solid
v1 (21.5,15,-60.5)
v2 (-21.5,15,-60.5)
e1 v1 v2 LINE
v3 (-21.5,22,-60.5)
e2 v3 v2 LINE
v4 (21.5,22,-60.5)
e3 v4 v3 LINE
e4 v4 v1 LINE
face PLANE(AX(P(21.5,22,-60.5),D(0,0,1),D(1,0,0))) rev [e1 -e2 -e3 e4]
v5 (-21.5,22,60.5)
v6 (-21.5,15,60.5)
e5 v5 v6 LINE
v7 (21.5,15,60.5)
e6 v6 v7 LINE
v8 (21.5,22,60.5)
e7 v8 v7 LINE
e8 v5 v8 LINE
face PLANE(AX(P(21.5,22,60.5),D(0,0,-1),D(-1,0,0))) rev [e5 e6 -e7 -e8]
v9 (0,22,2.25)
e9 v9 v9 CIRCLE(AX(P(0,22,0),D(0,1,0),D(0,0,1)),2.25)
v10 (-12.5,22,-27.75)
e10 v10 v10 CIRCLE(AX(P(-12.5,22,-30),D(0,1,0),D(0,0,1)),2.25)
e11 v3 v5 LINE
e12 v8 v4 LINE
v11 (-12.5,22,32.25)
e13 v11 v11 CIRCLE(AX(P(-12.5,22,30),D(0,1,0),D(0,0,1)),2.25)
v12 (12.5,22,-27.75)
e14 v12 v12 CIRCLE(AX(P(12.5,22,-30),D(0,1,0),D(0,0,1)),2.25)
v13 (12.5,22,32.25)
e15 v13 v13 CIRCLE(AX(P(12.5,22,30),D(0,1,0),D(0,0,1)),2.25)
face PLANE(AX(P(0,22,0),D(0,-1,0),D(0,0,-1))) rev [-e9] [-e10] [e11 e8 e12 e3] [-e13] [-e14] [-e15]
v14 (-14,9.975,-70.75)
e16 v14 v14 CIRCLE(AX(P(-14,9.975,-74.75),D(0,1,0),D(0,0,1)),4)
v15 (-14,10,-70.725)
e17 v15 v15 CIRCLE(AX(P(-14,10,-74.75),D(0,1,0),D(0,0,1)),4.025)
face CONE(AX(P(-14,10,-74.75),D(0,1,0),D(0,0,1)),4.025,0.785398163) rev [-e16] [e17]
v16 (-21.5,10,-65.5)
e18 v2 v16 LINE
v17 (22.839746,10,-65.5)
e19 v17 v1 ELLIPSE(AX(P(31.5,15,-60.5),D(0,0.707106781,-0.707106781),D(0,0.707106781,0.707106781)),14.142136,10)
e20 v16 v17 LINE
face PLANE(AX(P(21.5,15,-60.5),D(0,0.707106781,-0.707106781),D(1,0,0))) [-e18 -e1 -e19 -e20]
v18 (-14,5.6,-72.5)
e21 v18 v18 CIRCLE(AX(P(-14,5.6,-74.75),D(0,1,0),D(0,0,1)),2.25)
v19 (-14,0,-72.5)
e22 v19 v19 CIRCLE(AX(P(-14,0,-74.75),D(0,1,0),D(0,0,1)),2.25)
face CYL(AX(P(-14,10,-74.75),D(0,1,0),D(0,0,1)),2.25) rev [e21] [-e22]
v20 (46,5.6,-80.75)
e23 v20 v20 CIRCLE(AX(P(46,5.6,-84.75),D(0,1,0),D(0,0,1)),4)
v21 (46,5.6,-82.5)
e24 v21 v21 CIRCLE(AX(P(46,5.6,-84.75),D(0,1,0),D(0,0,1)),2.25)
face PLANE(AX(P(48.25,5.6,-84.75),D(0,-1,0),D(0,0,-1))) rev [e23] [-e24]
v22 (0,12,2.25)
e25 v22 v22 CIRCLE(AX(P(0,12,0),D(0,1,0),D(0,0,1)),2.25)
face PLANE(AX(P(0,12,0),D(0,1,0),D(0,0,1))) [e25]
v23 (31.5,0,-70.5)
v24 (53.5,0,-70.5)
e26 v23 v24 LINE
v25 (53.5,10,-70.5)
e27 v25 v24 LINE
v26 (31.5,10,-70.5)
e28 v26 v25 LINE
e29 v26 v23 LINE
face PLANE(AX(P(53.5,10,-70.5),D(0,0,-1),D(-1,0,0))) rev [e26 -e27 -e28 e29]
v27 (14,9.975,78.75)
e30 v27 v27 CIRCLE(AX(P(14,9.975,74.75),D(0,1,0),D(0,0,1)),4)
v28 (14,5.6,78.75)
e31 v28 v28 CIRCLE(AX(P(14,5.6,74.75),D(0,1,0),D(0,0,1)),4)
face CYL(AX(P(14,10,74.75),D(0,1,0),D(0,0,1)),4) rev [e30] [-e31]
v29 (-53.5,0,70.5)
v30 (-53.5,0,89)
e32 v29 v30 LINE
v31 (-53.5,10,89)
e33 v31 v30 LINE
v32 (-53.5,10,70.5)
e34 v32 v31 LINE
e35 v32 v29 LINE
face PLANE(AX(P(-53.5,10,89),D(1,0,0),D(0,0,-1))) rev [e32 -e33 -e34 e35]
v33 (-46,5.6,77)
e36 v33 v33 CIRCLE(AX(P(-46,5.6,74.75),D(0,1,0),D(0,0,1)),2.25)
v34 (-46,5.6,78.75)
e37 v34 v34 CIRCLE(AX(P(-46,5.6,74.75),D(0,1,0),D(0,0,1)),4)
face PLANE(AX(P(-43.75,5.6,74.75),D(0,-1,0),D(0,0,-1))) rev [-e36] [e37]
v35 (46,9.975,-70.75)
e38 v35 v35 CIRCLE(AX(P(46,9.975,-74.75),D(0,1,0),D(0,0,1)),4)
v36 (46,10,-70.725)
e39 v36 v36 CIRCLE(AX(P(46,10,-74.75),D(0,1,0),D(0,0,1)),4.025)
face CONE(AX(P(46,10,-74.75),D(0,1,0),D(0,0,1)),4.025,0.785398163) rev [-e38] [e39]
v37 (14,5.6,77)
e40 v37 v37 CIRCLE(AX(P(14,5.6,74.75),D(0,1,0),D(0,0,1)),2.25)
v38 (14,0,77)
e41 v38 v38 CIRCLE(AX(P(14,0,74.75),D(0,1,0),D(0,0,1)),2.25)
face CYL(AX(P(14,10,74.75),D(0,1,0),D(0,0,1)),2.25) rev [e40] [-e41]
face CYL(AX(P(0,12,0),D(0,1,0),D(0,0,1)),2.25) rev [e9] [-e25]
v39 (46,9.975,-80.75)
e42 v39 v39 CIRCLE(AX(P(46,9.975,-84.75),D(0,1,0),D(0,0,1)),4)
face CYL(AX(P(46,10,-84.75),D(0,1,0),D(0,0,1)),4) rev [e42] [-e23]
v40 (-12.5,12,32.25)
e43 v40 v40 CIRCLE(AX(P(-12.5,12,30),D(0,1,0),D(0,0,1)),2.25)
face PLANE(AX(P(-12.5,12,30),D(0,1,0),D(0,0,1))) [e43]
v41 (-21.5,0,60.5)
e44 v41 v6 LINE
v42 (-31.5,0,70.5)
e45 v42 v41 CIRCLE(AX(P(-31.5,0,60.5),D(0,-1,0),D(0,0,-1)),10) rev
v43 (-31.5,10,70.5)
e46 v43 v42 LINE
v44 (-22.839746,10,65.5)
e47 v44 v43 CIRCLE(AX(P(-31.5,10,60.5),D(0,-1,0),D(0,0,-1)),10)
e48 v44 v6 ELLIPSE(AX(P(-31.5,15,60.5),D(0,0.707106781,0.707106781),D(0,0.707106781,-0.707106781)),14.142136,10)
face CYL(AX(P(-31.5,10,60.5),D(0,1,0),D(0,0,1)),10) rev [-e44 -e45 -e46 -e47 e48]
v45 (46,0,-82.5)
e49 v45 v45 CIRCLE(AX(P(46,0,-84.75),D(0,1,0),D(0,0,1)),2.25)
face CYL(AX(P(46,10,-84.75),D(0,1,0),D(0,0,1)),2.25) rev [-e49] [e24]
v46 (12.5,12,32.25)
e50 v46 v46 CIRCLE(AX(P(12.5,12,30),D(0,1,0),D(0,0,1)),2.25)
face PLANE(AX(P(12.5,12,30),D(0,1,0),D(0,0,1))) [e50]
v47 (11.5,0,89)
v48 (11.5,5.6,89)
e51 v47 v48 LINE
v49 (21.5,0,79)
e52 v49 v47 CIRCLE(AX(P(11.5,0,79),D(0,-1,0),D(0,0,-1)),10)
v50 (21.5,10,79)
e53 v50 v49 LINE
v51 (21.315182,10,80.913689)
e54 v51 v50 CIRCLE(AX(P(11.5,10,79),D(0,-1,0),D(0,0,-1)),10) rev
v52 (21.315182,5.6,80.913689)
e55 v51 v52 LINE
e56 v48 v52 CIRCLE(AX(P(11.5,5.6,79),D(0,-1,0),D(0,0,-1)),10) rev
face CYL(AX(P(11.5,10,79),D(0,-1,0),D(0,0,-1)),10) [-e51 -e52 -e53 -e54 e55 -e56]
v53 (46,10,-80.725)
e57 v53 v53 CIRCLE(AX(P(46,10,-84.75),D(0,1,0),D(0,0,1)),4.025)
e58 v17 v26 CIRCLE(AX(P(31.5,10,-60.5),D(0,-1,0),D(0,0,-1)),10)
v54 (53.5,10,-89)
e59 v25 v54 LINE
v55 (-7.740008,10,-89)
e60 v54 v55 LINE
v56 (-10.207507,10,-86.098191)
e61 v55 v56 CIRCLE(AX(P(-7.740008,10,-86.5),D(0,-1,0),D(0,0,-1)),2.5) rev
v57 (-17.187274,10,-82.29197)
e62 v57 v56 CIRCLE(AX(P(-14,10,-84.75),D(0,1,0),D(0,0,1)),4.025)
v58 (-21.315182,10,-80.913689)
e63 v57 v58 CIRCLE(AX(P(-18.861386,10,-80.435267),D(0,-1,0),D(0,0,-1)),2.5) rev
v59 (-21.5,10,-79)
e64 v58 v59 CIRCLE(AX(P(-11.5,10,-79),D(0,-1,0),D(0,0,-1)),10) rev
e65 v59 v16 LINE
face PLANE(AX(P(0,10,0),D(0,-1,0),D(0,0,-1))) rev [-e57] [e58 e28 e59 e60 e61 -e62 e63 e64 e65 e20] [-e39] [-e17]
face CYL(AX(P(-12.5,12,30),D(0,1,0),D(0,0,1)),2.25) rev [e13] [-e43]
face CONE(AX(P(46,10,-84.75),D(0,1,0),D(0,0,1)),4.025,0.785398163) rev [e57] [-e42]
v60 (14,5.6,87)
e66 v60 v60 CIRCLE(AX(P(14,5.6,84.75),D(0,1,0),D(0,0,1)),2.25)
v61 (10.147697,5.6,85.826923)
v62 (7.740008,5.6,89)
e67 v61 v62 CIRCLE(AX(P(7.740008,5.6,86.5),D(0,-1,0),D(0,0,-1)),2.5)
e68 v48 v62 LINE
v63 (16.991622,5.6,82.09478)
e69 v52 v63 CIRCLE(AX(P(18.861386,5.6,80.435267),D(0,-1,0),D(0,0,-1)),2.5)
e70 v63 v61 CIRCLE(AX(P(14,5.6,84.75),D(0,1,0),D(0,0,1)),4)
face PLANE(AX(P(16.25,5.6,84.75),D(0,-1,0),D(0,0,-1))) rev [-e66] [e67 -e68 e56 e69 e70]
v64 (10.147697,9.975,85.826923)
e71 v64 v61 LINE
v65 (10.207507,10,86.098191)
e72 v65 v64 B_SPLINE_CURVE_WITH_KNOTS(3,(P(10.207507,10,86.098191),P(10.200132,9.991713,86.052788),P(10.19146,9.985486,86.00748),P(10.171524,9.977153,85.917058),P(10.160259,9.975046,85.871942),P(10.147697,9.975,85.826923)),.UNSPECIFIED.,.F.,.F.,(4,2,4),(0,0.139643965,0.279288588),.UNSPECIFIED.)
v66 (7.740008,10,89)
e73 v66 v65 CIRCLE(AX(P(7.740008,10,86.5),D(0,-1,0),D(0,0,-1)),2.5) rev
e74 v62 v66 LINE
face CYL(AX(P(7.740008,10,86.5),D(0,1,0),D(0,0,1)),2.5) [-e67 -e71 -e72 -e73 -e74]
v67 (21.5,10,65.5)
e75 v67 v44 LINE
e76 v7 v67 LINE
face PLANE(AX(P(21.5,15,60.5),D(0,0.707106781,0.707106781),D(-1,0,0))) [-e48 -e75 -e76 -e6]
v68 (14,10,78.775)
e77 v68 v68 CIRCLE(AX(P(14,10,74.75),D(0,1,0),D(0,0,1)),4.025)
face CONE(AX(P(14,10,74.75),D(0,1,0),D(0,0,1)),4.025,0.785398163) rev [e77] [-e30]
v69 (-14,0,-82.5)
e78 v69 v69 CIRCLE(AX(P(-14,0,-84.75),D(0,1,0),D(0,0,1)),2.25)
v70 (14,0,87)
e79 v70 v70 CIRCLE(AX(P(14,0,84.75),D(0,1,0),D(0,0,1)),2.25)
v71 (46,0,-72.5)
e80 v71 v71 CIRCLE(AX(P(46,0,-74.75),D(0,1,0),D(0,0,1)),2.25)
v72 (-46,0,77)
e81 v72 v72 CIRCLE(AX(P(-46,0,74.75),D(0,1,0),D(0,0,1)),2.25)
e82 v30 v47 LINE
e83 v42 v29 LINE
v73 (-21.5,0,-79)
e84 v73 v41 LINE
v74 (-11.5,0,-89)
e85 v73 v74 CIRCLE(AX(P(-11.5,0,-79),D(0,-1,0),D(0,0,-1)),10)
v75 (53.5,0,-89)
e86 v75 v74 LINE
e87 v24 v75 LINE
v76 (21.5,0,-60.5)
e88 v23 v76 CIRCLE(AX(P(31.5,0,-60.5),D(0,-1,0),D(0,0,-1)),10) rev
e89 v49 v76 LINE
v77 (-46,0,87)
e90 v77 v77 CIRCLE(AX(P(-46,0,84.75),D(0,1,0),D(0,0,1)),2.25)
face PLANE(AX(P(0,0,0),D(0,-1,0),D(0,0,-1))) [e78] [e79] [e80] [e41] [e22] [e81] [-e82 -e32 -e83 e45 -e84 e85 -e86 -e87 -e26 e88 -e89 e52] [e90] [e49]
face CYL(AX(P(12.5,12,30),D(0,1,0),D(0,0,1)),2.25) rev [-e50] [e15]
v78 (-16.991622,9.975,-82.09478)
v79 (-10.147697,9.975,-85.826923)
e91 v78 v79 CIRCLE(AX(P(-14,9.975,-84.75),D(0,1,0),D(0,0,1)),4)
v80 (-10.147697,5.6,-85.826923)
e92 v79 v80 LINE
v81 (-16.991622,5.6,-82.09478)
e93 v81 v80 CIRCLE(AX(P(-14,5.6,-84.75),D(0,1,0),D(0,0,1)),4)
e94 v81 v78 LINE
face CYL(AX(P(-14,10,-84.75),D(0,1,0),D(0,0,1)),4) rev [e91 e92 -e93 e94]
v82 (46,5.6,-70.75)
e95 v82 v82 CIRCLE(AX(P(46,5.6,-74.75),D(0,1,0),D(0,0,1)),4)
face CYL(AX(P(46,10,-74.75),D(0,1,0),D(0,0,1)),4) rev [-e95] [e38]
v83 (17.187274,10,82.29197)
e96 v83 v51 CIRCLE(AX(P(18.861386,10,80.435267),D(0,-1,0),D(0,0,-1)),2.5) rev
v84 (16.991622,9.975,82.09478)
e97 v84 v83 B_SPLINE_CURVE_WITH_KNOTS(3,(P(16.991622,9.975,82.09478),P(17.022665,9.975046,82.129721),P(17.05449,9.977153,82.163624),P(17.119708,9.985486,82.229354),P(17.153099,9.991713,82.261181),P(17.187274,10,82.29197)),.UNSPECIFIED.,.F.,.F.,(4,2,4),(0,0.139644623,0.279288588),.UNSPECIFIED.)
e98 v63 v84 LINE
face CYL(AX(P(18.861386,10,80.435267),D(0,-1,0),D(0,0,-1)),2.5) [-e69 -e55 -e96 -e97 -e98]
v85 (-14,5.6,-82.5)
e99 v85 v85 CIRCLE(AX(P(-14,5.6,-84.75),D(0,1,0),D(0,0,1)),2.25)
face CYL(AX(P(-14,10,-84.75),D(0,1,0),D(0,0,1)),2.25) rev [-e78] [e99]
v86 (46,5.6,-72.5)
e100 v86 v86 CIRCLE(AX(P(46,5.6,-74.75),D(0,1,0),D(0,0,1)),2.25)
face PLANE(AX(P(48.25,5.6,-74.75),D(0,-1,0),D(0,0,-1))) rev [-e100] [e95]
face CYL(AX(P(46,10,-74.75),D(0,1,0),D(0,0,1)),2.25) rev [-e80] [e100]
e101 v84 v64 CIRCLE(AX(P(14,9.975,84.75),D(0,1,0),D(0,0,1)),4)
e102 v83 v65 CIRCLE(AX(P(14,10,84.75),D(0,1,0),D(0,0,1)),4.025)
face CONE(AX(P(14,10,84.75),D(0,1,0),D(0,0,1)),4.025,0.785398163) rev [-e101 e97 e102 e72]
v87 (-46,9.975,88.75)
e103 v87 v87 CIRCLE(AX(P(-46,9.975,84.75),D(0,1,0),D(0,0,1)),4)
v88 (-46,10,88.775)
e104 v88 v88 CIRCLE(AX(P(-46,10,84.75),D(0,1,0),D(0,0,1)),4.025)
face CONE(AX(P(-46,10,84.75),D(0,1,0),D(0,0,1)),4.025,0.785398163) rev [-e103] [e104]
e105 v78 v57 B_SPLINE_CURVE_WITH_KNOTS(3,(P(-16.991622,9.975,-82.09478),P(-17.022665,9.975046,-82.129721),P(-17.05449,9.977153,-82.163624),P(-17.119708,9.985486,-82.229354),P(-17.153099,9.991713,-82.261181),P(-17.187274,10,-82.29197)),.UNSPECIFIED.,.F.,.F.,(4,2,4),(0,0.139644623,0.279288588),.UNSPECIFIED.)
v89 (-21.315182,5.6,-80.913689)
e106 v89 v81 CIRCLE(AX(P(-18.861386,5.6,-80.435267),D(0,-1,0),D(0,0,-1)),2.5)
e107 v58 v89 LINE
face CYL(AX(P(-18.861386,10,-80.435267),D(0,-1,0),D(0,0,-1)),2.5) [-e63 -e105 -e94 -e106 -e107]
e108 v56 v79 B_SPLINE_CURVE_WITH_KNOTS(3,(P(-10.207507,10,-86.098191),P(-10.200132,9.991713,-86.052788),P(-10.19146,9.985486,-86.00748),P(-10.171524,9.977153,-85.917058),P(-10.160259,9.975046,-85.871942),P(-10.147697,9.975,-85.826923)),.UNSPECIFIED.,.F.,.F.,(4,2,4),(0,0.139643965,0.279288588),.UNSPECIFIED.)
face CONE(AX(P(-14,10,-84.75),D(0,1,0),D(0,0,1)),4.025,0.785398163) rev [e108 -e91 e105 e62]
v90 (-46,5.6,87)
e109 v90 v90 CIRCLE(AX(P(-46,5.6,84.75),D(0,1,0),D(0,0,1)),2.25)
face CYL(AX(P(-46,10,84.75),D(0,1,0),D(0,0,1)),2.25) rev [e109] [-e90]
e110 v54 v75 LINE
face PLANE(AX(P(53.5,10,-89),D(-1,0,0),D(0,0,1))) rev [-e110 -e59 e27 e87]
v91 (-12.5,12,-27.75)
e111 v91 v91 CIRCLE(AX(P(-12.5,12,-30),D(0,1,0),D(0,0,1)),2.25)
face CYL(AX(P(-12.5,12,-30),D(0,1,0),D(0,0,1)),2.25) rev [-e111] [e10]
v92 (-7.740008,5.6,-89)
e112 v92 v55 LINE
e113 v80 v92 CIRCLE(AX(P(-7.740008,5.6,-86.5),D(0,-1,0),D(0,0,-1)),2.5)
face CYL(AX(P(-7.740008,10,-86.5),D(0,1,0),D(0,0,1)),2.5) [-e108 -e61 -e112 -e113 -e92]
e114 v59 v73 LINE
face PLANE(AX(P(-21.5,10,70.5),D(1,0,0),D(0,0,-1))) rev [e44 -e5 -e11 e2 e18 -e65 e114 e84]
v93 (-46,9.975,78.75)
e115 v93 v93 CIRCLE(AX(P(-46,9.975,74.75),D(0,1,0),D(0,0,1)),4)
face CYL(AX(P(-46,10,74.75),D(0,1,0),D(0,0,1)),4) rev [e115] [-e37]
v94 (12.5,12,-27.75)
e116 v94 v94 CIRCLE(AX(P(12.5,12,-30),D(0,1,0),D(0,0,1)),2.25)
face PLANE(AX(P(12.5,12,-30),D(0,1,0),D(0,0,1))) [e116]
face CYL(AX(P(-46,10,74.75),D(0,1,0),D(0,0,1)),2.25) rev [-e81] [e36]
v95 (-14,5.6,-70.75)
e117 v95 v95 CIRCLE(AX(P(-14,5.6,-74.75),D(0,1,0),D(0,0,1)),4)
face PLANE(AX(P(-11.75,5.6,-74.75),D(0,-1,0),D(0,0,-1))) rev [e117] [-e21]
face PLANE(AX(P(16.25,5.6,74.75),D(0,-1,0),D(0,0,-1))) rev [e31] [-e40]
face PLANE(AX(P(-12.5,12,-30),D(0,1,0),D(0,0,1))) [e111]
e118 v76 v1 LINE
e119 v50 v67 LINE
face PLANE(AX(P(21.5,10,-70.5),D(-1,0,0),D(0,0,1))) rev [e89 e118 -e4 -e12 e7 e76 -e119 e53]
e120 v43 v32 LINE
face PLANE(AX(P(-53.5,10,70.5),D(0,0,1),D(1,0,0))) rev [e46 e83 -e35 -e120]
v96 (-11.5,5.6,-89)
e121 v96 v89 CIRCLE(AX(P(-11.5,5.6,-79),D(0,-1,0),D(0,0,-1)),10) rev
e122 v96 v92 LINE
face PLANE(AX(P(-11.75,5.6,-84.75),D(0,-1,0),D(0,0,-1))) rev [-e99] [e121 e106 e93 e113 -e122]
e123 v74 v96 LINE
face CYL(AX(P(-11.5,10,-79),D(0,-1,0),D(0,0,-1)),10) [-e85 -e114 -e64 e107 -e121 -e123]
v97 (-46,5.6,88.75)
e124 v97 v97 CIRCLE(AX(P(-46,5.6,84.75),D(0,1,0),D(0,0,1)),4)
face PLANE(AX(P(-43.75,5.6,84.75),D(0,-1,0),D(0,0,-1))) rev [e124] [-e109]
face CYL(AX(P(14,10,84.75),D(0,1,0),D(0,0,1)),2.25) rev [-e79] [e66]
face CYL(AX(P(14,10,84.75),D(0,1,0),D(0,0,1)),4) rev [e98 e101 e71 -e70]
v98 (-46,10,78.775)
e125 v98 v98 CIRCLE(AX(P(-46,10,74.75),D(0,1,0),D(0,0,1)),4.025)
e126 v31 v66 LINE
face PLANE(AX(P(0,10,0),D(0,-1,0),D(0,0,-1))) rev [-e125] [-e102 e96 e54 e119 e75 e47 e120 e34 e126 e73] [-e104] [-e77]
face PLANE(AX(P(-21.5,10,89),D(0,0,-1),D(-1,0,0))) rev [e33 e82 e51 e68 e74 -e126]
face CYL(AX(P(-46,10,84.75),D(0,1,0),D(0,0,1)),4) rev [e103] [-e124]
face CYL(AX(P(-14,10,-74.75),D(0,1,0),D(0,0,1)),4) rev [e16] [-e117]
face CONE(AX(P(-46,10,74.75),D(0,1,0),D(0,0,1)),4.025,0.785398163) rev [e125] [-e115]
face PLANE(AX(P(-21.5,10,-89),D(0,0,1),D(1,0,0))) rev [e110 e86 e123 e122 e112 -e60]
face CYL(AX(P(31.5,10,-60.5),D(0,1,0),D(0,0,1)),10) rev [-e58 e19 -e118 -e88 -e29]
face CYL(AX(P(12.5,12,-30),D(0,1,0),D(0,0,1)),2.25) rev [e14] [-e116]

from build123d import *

# Parameters (mm, degrees)
BOSS_EXTRUDE1_DEPTH                          = 10
FILLET1_R                                    = 10
SKETCH2_R                                    = 1.75
CUT_EXTRUDE1_DEPTH                           = 10
CBORE_FOR_M4_HEX_SOCKET_HEAD_CAP_SCR_2_COUNT = 2
CBORE_FOR_M4_HEX_SOCKET_HEAD_CAP_SCR_2_PITCH = 10
CBORE_FOR_M4_HEX_SOCKET_HEAD_CAP_SCR_3_COUNT = 2
CBORE_FOR_M4_HEX_SOCKET_HEAD_CAP_SCR_3_PITCH = 60
CBORE_FOR_M4_HEX_SOCKET_HEAD_CAP_SCR_4_COUNT = 2
CBORE_FOR_M4_HEX_SOCKET_HEAD_CAP_SCR_4_PITCH = 152.099474029
CBORE_FOR_M4_HEX_SOCKET_HEAD_CAP_SCR_5_COUNT = 2
CBORE_FOR_M4_HEX_SOCKET_HEAD_CAP_SCR_5_PITCH = 161.939031737
CBORE_FOR_M4_HEX_SOCKET_HEAD_CAP_SCR_6_COUNT = 2
CBORE_FOR_M4_HEX_SOCKET_HEAD_CAP_SCR_6_PITCH = 162.67836365
CBORE_FOR_M4_HEX_SOCKET_HEAD_CAP_SCR_7_COUNT = 2
CBORE_FOR_M4_HEX_SOCKET_HEAD_CAP_SCR_7_PITCH = 152.886395732
CBORE_FOR_M4_HEX_SOCKET_HEAD_CAP_SCR_8_COUNT = 2
CBORE_FOR_M4_HEX_SOCKET_HEAD_CAP_SCR_8_PITCH = 60.827625303
FILLET2_R                                    = 2.5
FILLET3_R                                    = 2.5
SKETCH5_W                                    = 43
SKETCH5_H                                    = 121
BOSS_EXTRUDE2_DEPTH                          = 12
CHAMFER1_SIZE                                = 5
SKETCH7_R                                    = 2.25
CUT_EXTRUDE2_DEPTH                           = 10
SKETCH8_R                                    = 2.25
CUT_EXTRUDE3_DEPTH                           = 10


with BuildPart() as part:
    # Sketch1 → Boss-Extrude1 (new body)
    with BuildSketch(Plane(origin=(0, 0, 0), x_dir=(1, 0, 0), z_dir=(0, 1, 0))):
        Polygon((-21.5, -89), (21.5, -89), (21.5, 70.5), (53.5, 70.5), (53.5, 89), (-21.5, 89), (-21.5, -70.5), (-53.5, -70.5), (-53.5, -89), align=None)
    extrude(amount=BOSS_EXTRUDE1_DEPTH)

    # Fillet1
    fillet1_edges = [part.edges().sort_by_distance(p)[0] for p in [
        (-21.5, 5, 70.5),
        (-21.5, 5, -89),
        (21.5, 5, -70.5),
        (21.5, 5, 89),
    ]]
    fillet(fillet1_edges, radius=FILLET1_R)

    # Sketch2 → Cut-Extrude1 (cut)
    with BuildSketch(Plane(origin=(0, 10, 0), x_dir=(1, 0, 0), z_dir=(0, 1, 0))):
        with Locations(Location((-14, 74.75, 0), (0, 0, 270))):
            Circle(SKETCH2_R)
        with Locations(Location((-14, 84.75, 0), (0, 0, 270))):
            Circle(SKETCH2_R)
        with Locations(Location((46, 74.75, 0), (0, 0, 270))):
            Circle(SKETCH2_R)
        with Locations(Location((46, 84.75, 0), (0, 0, 270))):
            Circle(SKETCH2_R)
        with Locations(Location((-46, -74.75, 0), (0, 0, 270))):
            Circle(SKETCH2_R)
        with Locations(Location((-46, -84.75, 0), (0, 0, 270))):
            Circle(SKETCH2_R)
        with Locations(Location((14, -74.75, 0), (0, 0, 270))):
            Circle(SKETCH2_R)
        with Locations(Location((14, -84.75, 0), (0, 0, 270))):
            Circle(SKETCH2_R)
    extrude(amount=-CUT_EXTRUDE1_DEPTH, mode=Mode.SUBTRACT)

    # Sketch4 → CBORE for M4 Hex Socket Head Cap Screw1 (revolve, cut)
    with BuildSketch(Plane(origin=(-14, 10, -74.75), x_dir=(0, 0, 1), z_dir=(1, 0, 0))):
        Polygon((0, 0), (0, 11.351936393), (2.25, 10), (2.25, 4.4), (4, 4.4), (4, 0.025), (4.025, 0), align=None)
    cbore_for_m4_hex_socket_head_cap_screw1 = revolve(axis=Axis((-14, 16.35, -74.75), (0, -1, 0)), mode=Mode.SUBTRACT)

    # CBORE for M4 Hex Socket Head Cap Scr 2: CBORE for M4 Hex Socket Head Cap Screw1 ×2
    with Locations(*[(0, 0, -i * CBORE_FOR_M4_HEX_SOCKET_HEAD_CAP_SCR_2_PITCH) for i in range(1, CBORE_FOR_M4_HEX_SOCKET_HEAD_CAP_SCR_2_COUNT)]):
        add(cbore_for_m4_hex_socket_head_cap_screw1, mode=Mode.SUBTRACT)

    # CBORE for M4 Hex Socket Head Cap Scr 3: CBORE for M4 Hex Socket Head Cap Screw1 ×2
    with Locations(*[(i * CBORE_FOR_M4_HEX_SOCKET_HEAD_CAP_SCR_3_PITCH, 0, 0) for i in range(1, CBORE_FOR_M4_HEX_SOCKET_HEAD_CAP_SCR_3_COUNT)]):
        add(cbore_for_m4_hex_socket_head_cap_screw1, mode=Mode.SUBTRACT)

    # CBORE for M4 Hex Socket Head Cap Scr 4: CBORE for M4 Hex Socket Head Cap Screw1 ×2
    with Locations(*[Vector(0.1840900514527529, 0, 0.9829093818639248) * (i * CBORE_FOR_M4_HEX_SOCKET_HEAD_CAP_SCR_4_PITCH) for i in range(1, CBORE_FOR_M4_HEX_SOCKET_HEAD_CAP_SCR_4_COUNT)]):
        add(cbore_for_m4_hex_socket_head_cap_screw1, mode=Mode.SUBTRACT)

    # CBORE for M4 Hex Socket Head Cap Scr 5: CBORE for M4 Hex Socket Head Cap Screw1 ×2
    with Locations(*[Vector(0.1729045783441913, 0, 0.9849385802107751) * (i * CBORE_FOR_M4_HEX_SOCKET_HEAD_CAP_SCR_5_PITCH) for i in range(1, CBORE_FOR_M4_HEX_SOCKET_HEAD_CAP_SCR_5_COUNT)]):
        add(cbore_for_m4_hex_socket_head_cap_screw1, mode=Mode.SUBTRACT)

    # CBORE for M4 Hex Socket Head Cap Scr 6: CBORE for M4 Hex Socket Head Cap Screw1 ×2
    with Locations(*[Vector(-0.19670716671795496, 0, 0.9804622841097942) * (i * CBORE_FOR_M4_HEX_SOCKET_HEAD_CAP_SCR_6_PITCH) for i in range(1, CBORE_FOR_M4_HEX_SOCKET_HEAD_CAP_SCR_6_COUNT)]):
        add(cbore_for_m4_hex_socket_head_cap_screw1, mode=Mode.SUBTRACT)

    # CBORE for M4 Hex Socket Head Cap Scr 7: CBORE for M4 Hex Socket Head Cap Screw1 ×2
    with Locations(*[Vector(-0.20930573872668637, 0, 0.9778502481137263) * (i * CBORE_FOR_M4_HEX_SOCKET_HEAD_CAP_SCR_7_PITCH) for i in range(1, CBORE_FOR_M4_HEX_SOCKET_HEAD_CAP_SCR_7_COUNT)]):
        add(cbore_for_m4_hex_socket_head_cap_screw1, mode=Mode.SUBTRACT)

    # CBORE for M4 Hex Socket Head Cap Scr 8: CBORE for M4 Hex Socket Head Cap Screw1 ×2
    with Locations(*[Vector(0.9863939238321426, 0, -0.1643989873053641) * (i * CBORE_FOR_M4_HEX_SOCKET_HEAD_CAP_SCR_8_PITCH) for i in range(1, CBORE_FOR_M4_HEX_SOCKET_HEAD_CAP_SCR_8_COUNT)]):
        add(cbore_for_m4_hex_socket_head_cap_screw1, mode=Mode.SUBTRACT)

    # Fillet2
    # the kernel refuses this fillet: 2.5 mm, written as the material it takes off along each edge
    with BuildSketch(Plane(origin=(-13.754801439, 5.6, -88.742477635), x_dir=(0.9990847033117879, 0, -0.042775642699985884), z_dir=(0, 1, 0))) as fillet2_piece_1:
        with BuildLine():
            CenterArc((5.91336471, -2.497711758), FILLET2_R, 87.548388178, 105.618498276)
            Line((3.479087926, -3.067182162), (3.235660248, -3.124129202))
            ThreePointArc((3.235660248, -3.124129202), (2.064143441, -1.165399671), (-0.025984683, -0.248645925))
            Line((-0.025984683, -0.248645925), (-0.045899922, 0.245750274))
            ThreePointArc((-0.045899922, 0.245750274), (2.274447223, 0.410607251), (6.030997727, 0.249771176))
            Line((6.030997727, 0.249771176), (6.020303816, 0))
        make_face()
    extrude(amount=19.425759541, mode=Mode.SUBTRACT)
    with BuildSketch(Plane(origin=(-17.087010961, 5.6, -87.293690886), x_dir=(-0.5524220177087732, 0, 0.8335645831911094), z_dir=(0, 1, 0))) as fillet2_piece_2:
        with BuildLine():
            CenterArc((6.697143458, 2.309687979), FILLET2_R, 165.124054411, 127.376595494)
            ThreePointArc((4.280933593, 2.951505625), (2.685480046, 0.685252699), (0, 0))
            ThreePointArc((0, 0), (3.826939119, -0.761248083), (7.653878238, 0))
        make_face()
    extrude(amount=23.509695594, mode=Mode.SUBTRACT)

    # Fillet3
    # the kernel refuses this fillet: 2.5 mm, written as the material it takes off along each edge
    with BuildSketch(Plane(origin=(13.75480144, 5.6, 88.742477635), x_dir=(-0.7777172566996915, 0, -0.6286142446934416), z_dir=(0, 1, 0))) as fillet3_piece_1:
        with BuildLine():
            CenterArc((6.087462048, 2.036971289), FILLET3_R, 128.947957862, 105.618498276)
            Line((4.515926436, 3.98126443), (4.358772875, 4.175693744))
            ThreePointArc((4.358772875, 4.175693744), (1.434562202, 1.812109205), (-0.196946455, 0.153987317))
            Line((-0.196946455, 0.153987317), (0.144939573, -0.203697129))
            ThreePointArc((0.144939573, -0.203697129), (2.319033161, 0.490845938), (4.49312675, -0.203697129))
            Line((4.49312675, -0.203697129), (4.638066322, 0))
        make_face()
    extrude(amount=19.425759541, mode=Mode.SUBTRACT)
    with BuildSketch(Plane(origin=(17.087010961, 5.6, 87.293690886), x_dir=(-0.018344711955799436, 0, -0.9998317216128216), z_dir=(0, 1, 0))) as fillet3_piece_2:
        with BuildLine():
            CenterArc((6.824719559, -1.89989263), FILLET3_R, 130.539588182, 127.376595494)
            ThreePointArc((6.30136363, -4.344498645), (2.718581752, -2.798977477), (0, 0))
            ThreePointArc((0, 0), (2.599893165, -0.960171793), (5.19978633, 0))
        make_face()
    extrude(amount=23.509695594, mode=Mode.SUBTRACT)

    # Sketch5 → Boss-Extrude2 (add)
    with BuildSketch(Plane(origin=(0, 10, 0), x_dir=(1, 0, 0), z_dir=(0, 1, 0))):
        Rectangle(SKETCH5_W, SKETCH5_H)
    extrude(amount=BOSS_EXTRUDE2_DEPTH)

    # Chamfer1
    # the kernel refuses this chamfer: 5 mm, written as the material it adds along each edge
    with BuildSketch(Plane(origin=(34.35841494, 10, -60.5), x_dir=(0, -0.027495876610586317, -0.9996219169112968), z_dir=(-1, 0, 0))) as chamfer1_piece_1_section:
        Polygon((CHAMFER1_SIZE * 0.999621916911, -CHAMFER1_SIZE * 0.0274958766106), (-CHAMFER1_SIZE * 0.0274958766106, -CHAMFER1_SIZE * 0.999621916911), (0, 0), align=None)
    chamfer1_piece_1 = extrude(amount=55.85841494, mode=Mode.PRIVATE)
    chamfer1_piece_1 = chamfer1_piece_1 - Plane(origin=(31.5, 10.859011568, -60.5), x_dir=(0, 0, -1), z_dir=(0, 1, 0)) * Cylinder(10, 132, mode=Mode.PRIVATE)
    add(chamfer1_piece_1)
    with BuildSketch(Plane(origin=(-34.35841494, 10, 60.5), x_dir=(0, -0.027495876610586317, 0.9996219169112968), z_dir=(1, 0, 0))) as chamfer1_piece_2_section:
        Polygon((CHAMFER1_SIZE * 0.999621916911, -CHAMFER1_SIZE * 0.0274958766106), (-CHAMFER1_SIZE * 0.0274958766106, -CHAMFER1_SIZE * 0.999621916911), (0, 0), align=None)
    chamfer1_piece_2 = extrude(amount=55.85841494, mode=Mode.PRIVATE)
    chamfer1_piece_2 = chamfer1_piece_2 - Plane(origin=(-31.5, 10.859011568, 60.5), x_dir=(0, 0, 1), z_dir=(0, 1, 0)) * Cylinder(10, 132, mode=Mode.PRIVATE)
    add(chamfer1_piece_2)

    # Sketch7 → Cut-Extrude2 (cut)
    with BuildSketch(Plane(origin=(0, 22, 0), x_dir=(1, 0, 0), z_dir=(0, 1, 0))):
        with Locations(Location((0, 0, 0), (0, 0, 270))):
            Circle(SKETCH7_R)
    extrude(amount=-CUT_EXTRUDE2_DEPTH, mode=Mode.SUBTRACT)

    # Sketch8 → Cut-Extrude3 (cut)
    with BuildSketch(Plane(origin=(0, 22, 0), x_dir=(1, 0, 0), z_dir=(0, 1, 0))):
        with Locations(Location((12.5, 30, 0), (0, 0, 270))):
            Circle(SKETCH8_R)
        with Locations(Location((-12.5, 30, 0), (0, 0, 270))):
            Circle(SKETCH8_R)
        with Locations(Location((-12.5, -30, 0), (0, 0, 270))):
            Circle(SKETCH8_R)
        with Locations(Location((12.5, -30, 0), (0, 0, 270))):
            Circle(SKETCH8_R)
    extrude(amount=-CUT_EXTRUDE3_DEPTH, mode=Mode.SUBTRACT)


solid = part.part
